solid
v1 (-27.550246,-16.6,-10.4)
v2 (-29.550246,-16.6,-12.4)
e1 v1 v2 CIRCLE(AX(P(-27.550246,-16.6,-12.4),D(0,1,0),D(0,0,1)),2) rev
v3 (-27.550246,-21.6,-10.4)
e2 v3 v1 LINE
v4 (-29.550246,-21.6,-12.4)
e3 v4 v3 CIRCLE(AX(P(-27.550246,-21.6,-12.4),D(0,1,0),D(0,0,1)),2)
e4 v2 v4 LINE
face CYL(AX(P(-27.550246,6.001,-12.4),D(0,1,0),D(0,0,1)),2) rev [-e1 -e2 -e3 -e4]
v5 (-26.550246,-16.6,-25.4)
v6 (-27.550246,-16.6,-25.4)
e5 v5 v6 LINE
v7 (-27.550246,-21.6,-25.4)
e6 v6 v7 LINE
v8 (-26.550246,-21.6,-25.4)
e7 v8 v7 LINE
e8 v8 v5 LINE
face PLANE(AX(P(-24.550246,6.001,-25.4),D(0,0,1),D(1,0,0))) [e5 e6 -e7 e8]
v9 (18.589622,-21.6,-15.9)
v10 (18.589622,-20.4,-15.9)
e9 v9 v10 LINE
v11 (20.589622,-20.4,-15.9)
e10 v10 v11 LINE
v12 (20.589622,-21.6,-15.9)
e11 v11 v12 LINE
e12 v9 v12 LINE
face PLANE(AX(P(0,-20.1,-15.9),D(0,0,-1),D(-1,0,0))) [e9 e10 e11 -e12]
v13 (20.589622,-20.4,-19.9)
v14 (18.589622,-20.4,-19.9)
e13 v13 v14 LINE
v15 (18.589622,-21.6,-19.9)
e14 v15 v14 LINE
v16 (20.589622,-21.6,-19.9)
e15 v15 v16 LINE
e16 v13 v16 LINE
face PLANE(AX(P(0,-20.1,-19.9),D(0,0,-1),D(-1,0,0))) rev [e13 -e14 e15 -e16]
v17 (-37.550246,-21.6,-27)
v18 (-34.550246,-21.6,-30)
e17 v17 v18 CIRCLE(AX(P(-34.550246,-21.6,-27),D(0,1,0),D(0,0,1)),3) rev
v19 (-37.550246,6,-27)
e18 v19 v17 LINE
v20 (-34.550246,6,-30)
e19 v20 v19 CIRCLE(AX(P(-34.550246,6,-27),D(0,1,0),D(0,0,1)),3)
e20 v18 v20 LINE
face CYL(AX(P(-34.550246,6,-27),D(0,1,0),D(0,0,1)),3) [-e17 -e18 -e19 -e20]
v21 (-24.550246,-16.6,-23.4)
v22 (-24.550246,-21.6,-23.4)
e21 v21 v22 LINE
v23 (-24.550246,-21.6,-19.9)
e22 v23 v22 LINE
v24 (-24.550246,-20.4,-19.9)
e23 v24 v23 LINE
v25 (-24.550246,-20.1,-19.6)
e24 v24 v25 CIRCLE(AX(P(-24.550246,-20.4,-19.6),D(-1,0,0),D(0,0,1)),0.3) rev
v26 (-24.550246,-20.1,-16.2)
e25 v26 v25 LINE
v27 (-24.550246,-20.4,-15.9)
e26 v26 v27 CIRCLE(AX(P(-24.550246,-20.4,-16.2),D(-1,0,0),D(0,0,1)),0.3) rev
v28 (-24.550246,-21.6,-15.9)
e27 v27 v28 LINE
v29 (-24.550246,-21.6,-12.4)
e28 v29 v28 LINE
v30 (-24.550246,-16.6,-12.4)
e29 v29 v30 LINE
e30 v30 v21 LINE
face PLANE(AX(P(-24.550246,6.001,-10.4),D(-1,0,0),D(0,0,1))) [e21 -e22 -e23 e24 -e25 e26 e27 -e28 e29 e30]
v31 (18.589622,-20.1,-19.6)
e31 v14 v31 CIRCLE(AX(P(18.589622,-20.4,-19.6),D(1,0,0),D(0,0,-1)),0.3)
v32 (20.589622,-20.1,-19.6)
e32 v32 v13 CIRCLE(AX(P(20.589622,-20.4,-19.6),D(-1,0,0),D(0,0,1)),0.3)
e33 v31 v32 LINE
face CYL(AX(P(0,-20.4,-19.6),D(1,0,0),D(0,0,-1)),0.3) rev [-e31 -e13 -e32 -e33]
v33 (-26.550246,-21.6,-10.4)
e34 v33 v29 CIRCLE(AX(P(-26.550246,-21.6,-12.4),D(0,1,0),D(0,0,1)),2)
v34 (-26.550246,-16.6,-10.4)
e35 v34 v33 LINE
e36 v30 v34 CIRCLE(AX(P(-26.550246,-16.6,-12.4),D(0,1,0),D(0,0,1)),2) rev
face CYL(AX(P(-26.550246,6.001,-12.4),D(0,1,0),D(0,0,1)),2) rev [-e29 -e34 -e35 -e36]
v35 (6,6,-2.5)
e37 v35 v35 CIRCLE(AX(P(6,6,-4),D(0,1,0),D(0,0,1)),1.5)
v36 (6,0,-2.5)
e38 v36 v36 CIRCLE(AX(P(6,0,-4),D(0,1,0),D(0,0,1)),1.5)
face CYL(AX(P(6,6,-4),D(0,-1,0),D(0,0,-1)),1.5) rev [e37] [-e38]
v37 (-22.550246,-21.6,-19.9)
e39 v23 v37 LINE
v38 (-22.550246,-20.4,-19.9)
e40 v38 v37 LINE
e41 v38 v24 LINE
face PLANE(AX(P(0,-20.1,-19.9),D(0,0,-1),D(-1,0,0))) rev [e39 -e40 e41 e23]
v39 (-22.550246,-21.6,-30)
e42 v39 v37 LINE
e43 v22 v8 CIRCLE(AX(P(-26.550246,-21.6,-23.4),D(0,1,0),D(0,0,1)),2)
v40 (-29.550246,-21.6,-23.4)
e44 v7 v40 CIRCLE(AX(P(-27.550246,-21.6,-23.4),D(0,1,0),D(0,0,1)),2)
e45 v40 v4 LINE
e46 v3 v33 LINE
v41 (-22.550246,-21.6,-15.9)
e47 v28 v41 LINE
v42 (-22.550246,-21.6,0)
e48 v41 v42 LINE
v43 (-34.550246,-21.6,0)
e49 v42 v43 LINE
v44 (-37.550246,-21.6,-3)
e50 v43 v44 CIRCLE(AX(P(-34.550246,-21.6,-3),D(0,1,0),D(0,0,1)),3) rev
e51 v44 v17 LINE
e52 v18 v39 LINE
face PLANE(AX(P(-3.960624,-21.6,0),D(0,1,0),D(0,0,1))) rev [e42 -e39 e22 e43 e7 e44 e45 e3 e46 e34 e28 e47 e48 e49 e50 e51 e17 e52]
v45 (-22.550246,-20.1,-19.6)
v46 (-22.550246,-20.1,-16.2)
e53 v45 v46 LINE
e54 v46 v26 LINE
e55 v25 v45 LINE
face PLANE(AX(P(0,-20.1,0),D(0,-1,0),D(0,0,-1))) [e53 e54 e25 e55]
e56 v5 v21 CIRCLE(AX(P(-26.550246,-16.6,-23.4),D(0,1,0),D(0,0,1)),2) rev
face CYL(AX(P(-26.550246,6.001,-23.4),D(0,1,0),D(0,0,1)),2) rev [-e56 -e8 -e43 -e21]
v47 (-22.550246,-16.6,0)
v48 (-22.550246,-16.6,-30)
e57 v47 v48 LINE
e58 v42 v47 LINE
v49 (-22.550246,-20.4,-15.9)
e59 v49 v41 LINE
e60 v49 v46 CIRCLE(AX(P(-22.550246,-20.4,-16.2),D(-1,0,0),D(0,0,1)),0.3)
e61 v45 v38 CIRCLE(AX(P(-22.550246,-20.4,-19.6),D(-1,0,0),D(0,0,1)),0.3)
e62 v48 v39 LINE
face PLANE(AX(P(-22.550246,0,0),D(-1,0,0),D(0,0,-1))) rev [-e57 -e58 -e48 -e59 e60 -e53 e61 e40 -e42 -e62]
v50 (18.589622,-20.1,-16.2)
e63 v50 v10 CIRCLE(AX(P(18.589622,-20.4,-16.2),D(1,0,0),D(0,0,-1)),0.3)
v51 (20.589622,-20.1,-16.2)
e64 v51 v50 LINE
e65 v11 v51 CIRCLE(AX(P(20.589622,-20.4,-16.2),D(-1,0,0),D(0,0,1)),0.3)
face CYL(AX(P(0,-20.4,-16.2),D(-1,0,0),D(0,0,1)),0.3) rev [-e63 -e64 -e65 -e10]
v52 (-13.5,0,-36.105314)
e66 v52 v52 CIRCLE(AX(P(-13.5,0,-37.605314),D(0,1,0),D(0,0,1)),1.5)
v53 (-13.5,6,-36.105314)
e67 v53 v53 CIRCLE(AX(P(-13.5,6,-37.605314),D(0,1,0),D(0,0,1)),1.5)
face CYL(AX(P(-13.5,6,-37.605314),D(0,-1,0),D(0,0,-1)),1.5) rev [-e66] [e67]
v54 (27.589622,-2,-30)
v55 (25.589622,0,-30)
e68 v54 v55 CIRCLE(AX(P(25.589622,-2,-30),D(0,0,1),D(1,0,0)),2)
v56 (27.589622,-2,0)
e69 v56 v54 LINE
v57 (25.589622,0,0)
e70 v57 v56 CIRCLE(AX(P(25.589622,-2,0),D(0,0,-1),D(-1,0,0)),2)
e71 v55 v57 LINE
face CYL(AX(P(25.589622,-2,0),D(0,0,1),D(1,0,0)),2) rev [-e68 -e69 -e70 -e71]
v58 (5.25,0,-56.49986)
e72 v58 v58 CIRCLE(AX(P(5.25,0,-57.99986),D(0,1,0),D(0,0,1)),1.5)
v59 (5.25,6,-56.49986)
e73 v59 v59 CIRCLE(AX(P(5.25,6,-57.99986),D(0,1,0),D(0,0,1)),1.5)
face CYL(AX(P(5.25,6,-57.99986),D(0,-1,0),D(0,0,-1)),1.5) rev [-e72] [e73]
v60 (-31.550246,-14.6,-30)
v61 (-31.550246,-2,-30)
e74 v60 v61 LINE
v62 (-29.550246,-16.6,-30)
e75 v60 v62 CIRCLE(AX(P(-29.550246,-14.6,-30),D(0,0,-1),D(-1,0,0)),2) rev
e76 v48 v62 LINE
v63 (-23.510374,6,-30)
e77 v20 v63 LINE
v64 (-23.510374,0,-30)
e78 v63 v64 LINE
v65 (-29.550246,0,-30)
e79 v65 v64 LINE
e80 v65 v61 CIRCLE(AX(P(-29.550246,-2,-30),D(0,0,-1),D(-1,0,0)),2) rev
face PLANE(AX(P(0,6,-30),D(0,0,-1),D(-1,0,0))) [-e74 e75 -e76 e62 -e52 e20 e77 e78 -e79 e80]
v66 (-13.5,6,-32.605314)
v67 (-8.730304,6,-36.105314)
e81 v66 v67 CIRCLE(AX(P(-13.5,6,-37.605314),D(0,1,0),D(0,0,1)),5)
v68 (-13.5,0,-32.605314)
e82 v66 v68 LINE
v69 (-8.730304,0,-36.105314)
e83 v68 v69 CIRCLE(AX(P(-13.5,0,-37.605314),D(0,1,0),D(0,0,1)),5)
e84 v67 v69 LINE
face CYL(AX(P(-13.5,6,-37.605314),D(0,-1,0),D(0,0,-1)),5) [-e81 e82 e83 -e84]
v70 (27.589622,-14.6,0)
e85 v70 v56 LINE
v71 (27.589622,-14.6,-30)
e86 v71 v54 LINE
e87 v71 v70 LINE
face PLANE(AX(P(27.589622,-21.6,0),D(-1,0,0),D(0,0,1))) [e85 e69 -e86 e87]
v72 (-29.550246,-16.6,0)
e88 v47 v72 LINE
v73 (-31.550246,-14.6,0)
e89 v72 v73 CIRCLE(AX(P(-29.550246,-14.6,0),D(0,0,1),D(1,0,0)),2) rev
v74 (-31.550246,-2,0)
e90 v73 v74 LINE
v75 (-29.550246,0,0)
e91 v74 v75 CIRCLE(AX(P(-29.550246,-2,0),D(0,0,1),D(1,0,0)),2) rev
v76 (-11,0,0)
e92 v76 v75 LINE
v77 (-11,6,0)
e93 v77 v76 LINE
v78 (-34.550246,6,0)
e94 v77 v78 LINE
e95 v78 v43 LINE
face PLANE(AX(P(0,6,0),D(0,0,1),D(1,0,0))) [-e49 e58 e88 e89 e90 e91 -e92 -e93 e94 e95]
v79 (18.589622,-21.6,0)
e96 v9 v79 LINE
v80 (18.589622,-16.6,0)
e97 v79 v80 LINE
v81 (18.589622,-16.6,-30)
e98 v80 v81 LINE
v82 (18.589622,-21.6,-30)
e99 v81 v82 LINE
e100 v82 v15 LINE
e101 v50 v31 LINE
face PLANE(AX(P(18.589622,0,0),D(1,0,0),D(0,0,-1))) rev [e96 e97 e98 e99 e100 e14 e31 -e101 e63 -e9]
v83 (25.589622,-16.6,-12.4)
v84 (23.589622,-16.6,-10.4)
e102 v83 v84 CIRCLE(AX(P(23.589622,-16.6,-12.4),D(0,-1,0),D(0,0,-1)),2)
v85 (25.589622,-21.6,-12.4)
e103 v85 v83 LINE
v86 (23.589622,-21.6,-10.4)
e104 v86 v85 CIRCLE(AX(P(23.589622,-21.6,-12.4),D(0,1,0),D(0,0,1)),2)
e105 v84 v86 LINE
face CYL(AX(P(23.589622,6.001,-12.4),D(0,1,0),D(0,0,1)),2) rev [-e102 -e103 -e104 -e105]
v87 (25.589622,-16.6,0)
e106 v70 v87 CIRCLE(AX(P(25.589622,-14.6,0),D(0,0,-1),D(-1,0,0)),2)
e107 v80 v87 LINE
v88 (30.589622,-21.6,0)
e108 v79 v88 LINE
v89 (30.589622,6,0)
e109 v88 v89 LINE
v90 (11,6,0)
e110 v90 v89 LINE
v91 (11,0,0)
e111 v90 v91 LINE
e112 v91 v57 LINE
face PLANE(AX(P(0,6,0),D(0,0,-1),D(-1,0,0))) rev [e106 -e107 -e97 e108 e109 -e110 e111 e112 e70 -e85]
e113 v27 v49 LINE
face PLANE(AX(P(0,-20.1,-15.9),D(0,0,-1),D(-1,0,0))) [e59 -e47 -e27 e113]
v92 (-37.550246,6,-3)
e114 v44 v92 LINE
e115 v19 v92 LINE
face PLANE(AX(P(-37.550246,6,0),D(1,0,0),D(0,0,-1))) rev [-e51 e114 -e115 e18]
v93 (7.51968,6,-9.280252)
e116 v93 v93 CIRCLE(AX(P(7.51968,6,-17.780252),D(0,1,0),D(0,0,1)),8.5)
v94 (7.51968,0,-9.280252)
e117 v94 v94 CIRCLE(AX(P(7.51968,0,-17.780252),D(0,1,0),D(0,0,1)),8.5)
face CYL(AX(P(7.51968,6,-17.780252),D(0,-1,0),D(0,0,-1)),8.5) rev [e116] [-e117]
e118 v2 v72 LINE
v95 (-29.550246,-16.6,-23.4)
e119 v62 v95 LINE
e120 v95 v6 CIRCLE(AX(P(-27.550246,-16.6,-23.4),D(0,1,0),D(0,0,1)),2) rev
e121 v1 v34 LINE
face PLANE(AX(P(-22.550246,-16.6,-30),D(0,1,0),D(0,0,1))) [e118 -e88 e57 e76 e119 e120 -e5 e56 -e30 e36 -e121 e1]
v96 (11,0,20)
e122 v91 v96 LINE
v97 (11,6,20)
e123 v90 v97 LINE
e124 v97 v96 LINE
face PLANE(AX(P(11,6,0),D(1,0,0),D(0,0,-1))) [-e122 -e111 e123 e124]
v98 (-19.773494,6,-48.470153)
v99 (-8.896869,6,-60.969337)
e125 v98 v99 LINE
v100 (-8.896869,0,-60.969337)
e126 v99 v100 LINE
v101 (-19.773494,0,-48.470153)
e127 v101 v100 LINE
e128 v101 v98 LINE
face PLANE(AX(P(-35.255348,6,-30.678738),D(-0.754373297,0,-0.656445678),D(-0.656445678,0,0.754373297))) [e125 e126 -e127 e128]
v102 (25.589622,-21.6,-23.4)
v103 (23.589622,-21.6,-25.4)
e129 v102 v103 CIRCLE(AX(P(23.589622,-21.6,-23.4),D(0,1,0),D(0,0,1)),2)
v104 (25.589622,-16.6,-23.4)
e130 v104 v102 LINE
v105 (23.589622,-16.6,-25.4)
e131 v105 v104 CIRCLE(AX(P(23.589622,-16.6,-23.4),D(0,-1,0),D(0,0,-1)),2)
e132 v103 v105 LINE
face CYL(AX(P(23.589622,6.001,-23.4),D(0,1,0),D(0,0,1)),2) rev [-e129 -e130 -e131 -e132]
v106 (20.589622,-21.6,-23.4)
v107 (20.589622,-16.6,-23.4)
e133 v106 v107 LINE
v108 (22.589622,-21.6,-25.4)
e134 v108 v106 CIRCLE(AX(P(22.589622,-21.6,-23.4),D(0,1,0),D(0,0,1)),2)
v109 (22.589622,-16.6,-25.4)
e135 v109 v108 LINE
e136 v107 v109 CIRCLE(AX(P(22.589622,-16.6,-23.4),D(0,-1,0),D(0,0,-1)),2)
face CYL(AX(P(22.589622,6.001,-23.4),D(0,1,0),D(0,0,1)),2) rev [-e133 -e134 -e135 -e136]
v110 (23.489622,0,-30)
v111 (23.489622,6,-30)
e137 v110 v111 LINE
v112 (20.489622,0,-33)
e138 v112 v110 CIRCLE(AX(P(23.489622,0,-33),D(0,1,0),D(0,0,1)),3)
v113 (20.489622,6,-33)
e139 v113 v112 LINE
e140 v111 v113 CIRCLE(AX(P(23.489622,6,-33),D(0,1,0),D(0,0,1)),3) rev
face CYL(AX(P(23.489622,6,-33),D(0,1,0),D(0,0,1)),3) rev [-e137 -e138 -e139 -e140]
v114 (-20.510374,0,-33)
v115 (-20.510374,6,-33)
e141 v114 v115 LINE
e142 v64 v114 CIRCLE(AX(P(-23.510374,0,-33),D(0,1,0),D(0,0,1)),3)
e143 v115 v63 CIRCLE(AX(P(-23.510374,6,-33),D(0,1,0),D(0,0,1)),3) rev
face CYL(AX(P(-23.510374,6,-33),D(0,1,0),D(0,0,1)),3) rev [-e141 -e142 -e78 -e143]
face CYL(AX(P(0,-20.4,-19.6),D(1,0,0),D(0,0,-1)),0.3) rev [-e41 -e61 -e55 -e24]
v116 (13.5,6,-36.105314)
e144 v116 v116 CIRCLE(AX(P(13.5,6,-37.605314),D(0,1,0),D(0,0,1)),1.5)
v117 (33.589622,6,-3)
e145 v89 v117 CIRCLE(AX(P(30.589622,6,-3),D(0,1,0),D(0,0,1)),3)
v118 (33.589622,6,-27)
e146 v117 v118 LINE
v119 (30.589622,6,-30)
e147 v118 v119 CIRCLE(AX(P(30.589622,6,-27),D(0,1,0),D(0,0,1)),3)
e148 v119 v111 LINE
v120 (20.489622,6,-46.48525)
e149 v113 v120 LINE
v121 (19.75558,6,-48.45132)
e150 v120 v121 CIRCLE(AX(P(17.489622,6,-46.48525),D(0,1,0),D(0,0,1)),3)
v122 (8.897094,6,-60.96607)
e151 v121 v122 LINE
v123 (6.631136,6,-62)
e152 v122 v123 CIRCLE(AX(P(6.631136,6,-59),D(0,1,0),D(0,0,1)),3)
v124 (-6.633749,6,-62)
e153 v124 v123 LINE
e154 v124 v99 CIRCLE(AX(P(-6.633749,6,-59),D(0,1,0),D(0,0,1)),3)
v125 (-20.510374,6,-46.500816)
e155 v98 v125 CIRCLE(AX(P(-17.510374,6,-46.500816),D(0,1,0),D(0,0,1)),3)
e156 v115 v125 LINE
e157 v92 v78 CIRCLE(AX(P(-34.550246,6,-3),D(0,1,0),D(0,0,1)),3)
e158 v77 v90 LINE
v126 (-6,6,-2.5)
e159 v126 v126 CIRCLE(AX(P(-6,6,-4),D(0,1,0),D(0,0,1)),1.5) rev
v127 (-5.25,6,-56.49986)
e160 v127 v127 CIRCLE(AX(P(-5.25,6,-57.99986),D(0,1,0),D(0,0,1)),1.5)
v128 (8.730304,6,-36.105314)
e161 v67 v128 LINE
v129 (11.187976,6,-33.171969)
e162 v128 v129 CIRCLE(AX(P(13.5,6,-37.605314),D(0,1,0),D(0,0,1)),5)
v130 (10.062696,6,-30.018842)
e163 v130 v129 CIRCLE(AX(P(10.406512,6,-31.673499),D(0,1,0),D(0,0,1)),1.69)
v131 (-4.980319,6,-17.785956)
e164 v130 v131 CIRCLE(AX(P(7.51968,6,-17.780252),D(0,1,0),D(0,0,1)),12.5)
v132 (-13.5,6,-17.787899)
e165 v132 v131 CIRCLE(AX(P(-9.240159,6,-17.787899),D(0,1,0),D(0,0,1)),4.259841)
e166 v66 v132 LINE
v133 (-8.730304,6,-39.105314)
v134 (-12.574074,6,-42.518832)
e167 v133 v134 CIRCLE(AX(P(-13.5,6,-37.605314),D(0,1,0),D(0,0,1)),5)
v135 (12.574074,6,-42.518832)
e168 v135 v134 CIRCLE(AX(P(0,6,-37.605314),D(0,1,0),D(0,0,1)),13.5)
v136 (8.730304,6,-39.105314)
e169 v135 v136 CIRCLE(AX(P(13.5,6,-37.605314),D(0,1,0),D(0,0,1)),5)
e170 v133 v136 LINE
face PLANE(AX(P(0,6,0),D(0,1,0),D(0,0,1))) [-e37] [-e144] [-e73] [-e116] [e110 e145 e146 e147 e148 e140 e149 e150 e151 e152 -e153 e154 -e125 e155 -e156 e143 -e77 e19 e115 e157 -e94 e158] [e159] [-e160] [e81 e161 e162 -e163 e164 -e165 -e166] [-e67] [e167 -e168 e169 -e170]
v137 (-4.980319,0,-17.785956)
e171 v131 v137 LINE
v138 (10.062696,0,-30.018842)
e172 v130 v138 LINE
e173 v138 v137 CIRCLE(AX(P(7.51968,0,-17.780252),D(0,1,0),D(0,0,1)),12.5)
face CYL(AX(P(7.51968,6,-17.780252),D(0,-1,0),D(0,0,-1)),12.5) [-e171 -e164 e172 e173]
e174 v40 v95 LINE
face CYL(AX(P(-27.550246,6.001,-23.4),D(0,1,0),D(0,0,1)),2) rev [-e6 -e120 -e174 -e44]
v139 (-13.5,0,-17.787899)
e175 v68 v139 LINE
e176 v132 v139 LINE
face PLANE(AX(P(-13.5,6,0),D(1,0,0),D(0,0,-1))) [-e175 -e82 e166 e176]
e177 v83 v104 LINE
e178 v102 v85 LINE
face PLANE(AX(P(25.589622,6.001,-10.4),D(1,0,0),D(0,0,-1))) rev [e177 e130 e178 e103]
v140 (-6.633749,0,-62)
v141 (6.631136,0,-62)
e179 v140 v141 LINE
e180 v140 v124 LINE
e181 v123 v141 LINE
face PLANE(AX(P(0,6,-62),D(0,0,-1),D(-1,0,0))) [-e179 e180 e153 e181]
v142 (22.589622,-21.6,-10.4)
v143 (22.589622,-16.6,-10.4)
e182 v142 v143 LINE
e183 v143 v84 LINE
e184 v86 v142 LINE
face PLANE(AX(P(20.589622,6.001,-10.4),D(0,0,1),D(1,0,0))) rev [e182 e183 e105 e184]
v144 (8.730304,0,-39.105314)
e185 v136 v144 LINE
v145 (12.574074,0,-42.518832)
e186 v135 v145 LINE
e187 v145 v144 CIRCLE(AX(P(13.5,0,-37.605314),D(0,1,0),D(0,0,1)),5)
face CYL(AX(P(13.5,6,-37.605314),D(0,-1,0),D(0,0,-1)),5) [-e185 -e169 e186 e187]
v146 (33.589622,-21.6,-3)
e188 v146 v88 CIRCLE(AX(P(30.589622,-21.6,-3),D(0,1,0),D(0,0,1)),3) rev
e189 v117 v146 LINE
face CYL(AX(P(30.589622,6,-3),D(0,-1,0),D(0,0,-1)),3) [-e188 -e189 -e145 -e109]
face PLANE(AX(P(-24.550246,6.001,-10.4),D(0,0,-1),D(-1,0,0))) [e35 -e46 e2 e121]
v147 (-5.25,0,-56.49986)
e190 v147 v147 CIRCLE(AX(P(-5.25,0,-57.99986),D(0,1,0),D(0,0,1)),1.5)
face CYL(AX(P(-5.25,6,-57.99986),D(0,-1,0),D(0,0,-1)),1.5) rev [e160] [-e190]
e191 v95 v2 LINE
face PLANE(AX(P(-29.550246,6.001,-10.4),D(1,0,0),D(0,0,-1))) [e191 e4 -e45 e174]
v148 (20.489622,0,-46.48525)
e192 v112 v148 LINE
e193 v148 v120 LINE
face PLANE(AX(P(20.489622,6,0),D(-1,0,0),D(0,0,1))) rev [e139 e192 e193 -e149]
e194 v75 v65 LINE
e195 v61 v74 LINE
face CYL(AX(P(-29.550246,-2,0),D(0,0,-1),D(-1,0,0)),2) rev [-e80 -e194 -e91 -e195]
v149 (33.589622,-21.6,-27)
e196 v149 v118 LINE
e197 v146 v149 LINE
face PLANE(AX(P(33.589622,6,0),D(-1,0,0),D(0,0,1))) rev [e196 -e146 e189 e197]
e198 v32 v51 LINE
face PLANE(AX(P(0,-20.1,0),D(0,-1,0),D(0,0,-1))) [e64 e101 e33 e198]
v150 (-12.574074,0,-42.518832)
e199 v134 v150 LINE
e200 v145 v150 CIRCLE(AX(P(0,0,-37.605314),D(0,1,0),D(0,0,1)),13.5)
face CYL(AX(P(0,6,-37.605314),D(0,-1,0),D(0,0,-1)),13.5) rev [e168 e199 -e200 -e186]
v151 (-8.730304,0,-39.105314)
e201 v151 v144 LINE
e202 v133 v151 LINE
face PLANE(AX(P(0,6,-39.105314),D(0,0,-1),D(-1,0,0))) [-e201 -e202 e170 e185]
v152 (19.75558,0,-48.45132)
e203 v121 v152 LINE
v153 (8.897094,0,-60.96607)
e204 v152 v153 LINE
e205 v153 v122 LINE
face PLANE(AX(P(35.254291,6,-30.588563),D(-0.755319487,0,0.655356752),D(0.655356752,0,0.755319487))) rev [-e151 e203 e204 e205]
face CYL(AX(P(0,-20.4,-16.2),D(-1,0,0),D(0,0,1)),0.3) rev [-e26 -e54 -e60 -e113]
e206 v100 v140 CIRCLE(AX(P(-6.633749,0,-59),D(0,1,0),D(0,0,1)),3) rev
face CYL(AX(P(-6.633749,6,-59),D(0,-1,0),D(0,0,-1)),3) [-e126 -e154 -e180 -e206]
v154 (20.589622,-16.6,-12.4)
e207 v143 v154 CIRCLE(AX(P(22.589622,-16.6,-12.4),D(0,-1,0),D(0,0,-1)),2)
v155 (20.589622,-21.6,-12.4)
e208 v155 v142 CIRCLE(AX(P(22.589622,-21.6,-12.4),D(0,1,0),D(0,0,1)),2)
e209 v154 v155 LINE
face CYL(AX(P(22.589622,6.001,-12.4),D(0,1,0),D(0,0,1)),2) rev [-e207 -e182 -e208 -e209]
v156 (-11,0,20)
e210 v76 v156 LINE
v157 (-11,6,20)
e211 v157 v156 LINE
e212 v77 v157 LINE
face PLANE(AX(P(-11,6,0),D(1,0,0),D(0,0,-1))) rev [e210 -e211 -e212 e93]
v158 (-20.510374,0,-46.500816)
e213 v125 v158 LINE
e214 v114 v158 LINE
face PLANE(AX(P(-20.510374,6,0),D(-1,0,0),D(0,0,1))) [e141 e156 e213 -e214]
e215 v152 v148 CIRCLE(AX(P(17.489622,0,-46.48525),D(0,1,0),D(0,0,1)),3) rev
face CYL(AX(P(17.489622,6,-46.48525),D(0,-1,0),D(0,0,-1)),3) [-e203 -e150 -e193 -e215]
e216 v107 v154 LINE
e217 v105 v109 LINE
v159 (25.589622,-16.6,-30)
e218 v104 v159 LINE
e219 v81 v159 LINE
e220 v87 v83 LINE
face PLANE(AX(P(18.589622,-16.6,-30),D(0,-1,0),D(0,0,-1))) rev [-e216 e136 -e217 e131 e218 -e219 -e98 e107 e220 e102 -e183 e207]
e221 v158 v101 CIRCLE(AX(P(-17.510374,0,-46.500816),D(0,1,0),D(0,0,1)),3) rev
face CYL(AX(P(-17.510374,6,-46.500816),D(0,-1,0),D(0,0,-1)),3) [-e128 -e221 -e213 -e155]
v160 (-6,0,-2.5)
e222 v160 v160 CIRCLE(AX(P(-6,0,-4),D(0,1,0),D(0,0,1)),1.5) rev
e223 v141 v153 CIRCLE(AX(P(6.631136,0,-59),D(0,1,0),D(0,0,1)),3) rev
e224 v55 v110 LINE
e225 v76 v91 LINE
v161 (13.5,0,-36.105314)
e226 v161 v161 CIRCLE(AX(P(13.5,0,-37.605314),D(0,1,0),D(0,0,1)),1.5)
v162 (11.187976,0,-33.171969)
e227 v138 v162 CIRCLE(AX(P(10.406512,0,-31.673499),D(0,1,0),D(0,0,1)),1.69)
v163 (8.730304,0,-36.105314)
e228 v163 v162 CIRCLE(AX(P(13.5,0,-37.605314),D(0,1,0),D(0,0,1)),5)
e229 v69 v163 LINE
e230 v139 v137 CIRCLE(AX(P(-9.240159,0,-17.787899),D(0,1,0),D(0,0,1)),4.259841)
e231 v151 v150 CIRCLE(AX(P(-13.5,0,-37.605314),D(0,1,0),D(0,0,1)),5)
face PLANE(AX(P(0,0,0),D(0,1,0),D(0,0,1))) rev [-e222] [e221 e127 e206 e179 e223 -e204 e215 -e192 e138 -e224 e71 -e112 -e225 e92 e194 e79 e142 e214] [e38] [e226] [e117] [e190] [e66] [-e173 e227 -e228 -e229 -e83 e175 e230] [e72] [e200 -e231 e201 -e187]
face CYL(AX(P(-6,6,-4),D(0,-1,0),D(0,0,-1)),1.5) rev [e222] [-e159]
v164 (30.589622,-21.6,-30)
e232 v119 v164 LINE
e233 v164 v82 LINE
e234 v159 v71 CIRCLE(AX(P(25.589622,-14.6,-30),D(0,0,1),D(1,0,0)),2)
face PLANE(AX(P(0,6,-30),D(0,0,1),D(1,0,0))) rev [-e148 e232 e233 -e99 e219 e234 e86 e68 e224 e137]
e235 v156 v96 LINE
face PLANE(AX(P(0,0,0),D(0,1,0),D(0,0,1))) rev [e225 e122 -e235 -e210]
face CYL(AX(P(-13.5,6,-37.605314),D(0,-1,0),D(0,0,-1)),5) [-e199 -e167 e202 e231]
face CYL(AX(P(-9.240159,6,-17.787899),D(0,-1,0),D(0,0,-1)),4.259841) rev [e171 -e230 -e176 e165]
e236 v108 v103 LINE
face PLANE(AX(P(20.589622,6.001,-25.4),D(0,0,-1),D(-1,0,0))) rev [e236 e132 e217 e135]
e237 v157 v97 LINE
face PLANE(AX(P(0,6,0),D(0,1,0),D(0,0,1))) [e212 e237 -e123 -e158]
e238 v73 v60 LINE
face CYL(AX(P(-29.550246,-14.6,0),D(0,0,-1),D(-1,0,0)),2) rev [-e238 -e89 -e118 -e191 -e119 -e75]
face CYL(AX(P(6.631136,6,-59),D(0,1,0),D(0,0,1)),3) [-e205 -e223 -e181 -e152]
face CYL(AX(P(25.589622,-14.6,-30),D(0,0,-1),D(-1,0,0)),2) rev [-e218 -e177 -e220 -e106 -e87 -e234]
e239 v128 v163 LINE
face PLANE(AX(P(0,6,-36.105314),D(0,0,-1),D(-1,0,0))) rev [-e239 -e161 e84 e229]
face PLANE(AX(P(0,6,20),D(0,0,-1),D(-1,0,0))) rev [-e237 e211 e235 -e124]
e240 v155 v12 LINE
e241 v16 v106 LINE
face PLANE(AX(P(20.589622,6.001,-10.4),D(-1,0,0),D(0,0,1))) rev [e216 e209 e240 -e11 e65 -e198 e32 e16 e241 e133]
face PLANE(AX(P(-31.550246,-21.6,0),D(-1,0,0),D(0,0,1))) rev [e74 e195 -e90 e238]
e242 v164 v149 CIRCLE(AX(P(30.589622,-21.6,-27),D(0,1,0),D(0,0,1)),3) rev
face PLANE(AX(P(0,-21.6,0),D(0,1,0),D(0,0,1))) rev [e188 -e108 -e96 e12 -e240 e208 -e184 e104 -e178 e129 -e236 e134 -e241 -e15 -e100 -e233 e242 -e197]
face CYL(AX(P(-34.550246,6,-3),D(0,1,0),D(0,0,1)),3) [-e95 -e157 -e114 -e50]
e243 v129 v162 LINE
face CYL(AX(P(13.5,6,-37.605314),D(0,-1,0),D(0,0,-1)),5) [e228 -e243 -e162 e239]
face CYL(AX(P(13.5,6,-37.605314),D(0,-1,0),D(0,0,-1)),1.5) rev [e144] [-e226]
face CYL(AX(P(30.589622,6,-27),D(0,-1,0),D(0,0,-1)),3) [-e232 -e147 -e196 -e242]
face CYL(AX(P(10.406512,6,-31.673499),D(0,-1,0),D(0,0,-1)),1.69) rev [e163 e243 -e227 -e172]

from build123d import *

# Parameters (mm, degrees)
SKETCH1_R                = 1.5
SKETCH1_R_2              = 8.5
SKETCH1_W                = 6
SKETCH1_H                = 30
SKETCH1_W_2              = 22
SKETCH1_H_2              = 20
BOSS_EXTRUDE1_DEPTH      = 6
SKETCH1_5_W              = 6
SKETCH1_5_H              = 30
RESSALTO_EXTRUS_O1_DEPTH = 21.6
ESBO_O1_W                = 30
ESBO_O1_H                = 5
RESSALTO_EXTRUS_O2_DEPTH = 9
CORTE_EXTRUS_O1_REACH    = 79.561
ESBO_O2_W                = 5
ESBO_O2_H                = 15
FILETE2_R                = 2
FILETE2_OF_ESPELHAR1_R   = 2
FILLET1_R                = 3
FILETE1_R                = 2
ESBO_O4_W                = 2
ESBO_O4_H                = 4
ESBO_O4_W_2              = 45.13986754
CORTE_EXTRUS_O3_DEPTH    = 1.5
FILETE3_R                = 0.3


with BuildPart() as part:
    # Sketch1 → Boss-Extrude1 (new body)
    # profile 1 of 6: a face of its own
    with BuildSketch(Plane(origin=(0, 0, 0), x_dir=(1, 0, 0), z_dir=(0, 1, 0))):
        Polygon((-20.510374251, 47.623346162), (-8, 62), (8, 62), (20.489621783, 47.605313925), (20.489621783, 17.605313925), (11, 0), (-11, 0), (-20.510374251, 17.623346162), align=None)
        with Locations(Location((13.5, 37.605313925, 0), (0, 0, 270))):
            Circle(SKETCH1_R, mode=Mode.SUBTRACT)
        with Locations(Location((-13.5, 37.605313925, 0), (0, 0, 270))):
            Circle(SKETCH1_R, mode=Mode.SUBTRACT)
        with Locations(Location((5.25, 57.999859765, 0), (0, 0, 270))):
            Circle(SKETCH1_R, mode=Mode.SUBTRACT)
        with Locations(Location((-5.25, 57.999859765, 0), (0, 0, 270))):
            Circle(SKETCH1_R, mode=Mode.SUBTRACT)
        with Locations(Location((7.519679741, 17.780252273, 0), (0, 0, 270))):
            Circle(SKETCH1_R_2, mode=Mode.SUBTRACT)
        with Locations(Location((6, 4, 0), (0, 0, 270))):
            Circle(SKETCH1_R, mode=Mode.SUBTRACT)
        with Locations(Location((-6, 4, 0), (0, 0, 270))):
            Circle(SKETCH1_R, mode=Mode.SUBTRACT)
        with BuildLine():
            ThreePointArc((10.062695821, 30.018841621), (11.998189223, 31.105465162), (11.187975781, 33.171969363))
            ThreePointArc((11.187975781, 33.171969363), (9.667400631, 34.394210987), (8.730303993, 36.105313925))
            Line((8.730303993, 36.105313925), (-8.730303993, 36.105313925))
            ThreePointArc((-8.730303993, 36.105313925), (-10.541960108, 33.574185051), (-13.5, 32.605313925))
            Line((-13.5, 32.605313925), (-13.5, 17.787899155))
            ThreePointArc((-13.5, 17.787899155), (-9.241131059, 13.528058523), (-4.980318958, 17.785955551))
            ThreePointArc((-4.980318958, 17.785955551), (-0.366780245, 27.478383479), (10.062695821, 30.018841621))
        make_face(mode=Mode.SUBTRACT)
        with BuildLine():
            ThreePointArc((12.574074074, 42.518832133), (0, 51.105313925), (-12.574074074, 42.518832133))
            ThreePointArc((-12.574074074, 42.518832133), (-10.179901517, 41.34388933), (-8.730303993, 39.105313925))
            Line((-8.730303993, 39.105313925), (8.730303993, 39.105313925))
            ThreePointArc((8.730303993, 39.105313925), (10.179901517, 41.34388933), (12.574074074, 42.518832133))
        make_face(mode=Mode.SUBTRACT)
    # profile 2 of 6: a face of its own
    with BuildSketch(Plane(origin=(0, 0, 0), x_dir=(1, 0, 0), z_dir=(0, 1, 0))):
        Polygon((20.489621783, 17.605313925), (11, 0), (27.589621783, 0), (27.589621783, 30), (20.489621783, 30), align=None)
    # profile 3 of 6: a face of its own
    with BuildSketch(Plane(origin=(0, 0, 0), x_dir=(1, 0, 0), z_dir=(0, 1, 0))):
        with Locations((30.589621783, 15)):
            Rectangle(SKETCH1_W, SKETCH1_H)
    # profile 4 of 6: a face of its own
    with BuildSketch(Plane(origin=(0, 0, 0), x_dir=(1, 0, 0), z_dir=(0, 1, 0))):
        with Locations((0, -10)):
            Rectangle(SKETCH1_W_2, SKETCH1_H_2)
    # profile 5 of 6: a face of its own
    with BuildSketch(Plane(origin=(0, 0, 0), x_dir=(1, 0, 0), z_dir=(0, 1, 0))):
        Polygon((-31.550245757, 0), (-11, 0), (-20.510374251, 17.623346162), (-20.510374251, 30), (-31.550245757, 30), align=None)
    # profile 6 of 6: a face of its own
    with BuildSketch(Plane(origin=(0, 0, 0), x_dir=(1, 0, 0), z_dir=(0, 1, 0))):
        with Locations((-34.550245757, 15)):
            Rectangle(SKETCH1_W, SKETCH1_H)
    extrude(amount=BOSS_EXTRUDE1_DEPTH)

    # Sketch1<5> → Ressalto-extrusão1 (add)
    with BuildSketch(Plane(origin=(0, 0, 0), x_dir=(1, 0, 0), z_dir=(0, 1, 0))):
        with Locations((30.589621783, 15)):
            Rectangle(SKETCH1_5_W, SKETCH1_5_H)
    ressalto_extrus_o1 = extrude(amount=-RESSALTO_EXTRUS_O1_DEPTH)

    # Esboço1 → Ressalto-extrusão2 (add)
    with BuildSketch(Plane.ZY.offset(-27.589621783)):
        with Locations((-15, -19.1)):
            Rectangle(ESBO_O1_W, ESBO_O1_H)
    ressalto_extrus_o2 = extrude(amount=RESSALTO_EXTRUS_O2_DEPTH)

    # Esboço2 → Corte-extrusão1 (cut, up to next)
    with BuildSketch(Plane.XZ.offset(21.6), mode=Mode.PRIVATE) as corte_extrus_o1_sk1:
        with Locations((23.089621783, -17.9)):
            Rectangle(ESBO_O2_W, ESBO_O2_H)
    corte_extrus_o1_tool1 = extrude(corte_extrus_o1_sk1.sketch, amount=-CORTE_EXTRUS_O1_REACH, mode=Mode.PRIVATE) & part.part
    corte_extrus_o1 = corte_extrus_o1_tool1.solids().sort_by_distance((23.089622, -21.6, -17.9))[0]
    add(corte_extrus_o1, mode=Mode.SUBTRACT)

    # Filete2
    filete2_edges = [part.edges().sort_by_distance(p)[0] for p in [
        (25.589621783, -19.1, -25.4),
        (25.589621783, -19.1, -10.4),
        (20.589621783, -19.1, -10.4),
        (20.589621783, -19.1, -25.4),
    ]]
    fillet(filete2_edges, radius=FILETE2_R)

    # Espelhar1: Ressalto-extrusão1, Ressalto-extrusão2, Corte-extrusão1 across plane
    add(ressalto_extrus_o1.mirror(Plane.ZY.offset(1.980311987)))
    add(ressalto_extrus_o2.mirror(Plane.ZY.offset(1.980311987)))
    add(corte_extrus_o1.mirror(Plane.ZY.offset(1.980311987)), mode=Mode.SUBTRACT)

    # Filete2 of Espelhar1
    filete2_of_espelhar1_edges = [part.edges().sort_by_distance(p)[0] for p in [
        (-29.550245757, -19.1, -25.4),
        (-29.550245757, -19.1, -10.4),
        (-24.550245757, -19.1, -10.4),
        (-24.550245757, -19.1, -25.4),
    ]]
    fillet(filete2_of_espelhar1_edges, radius=FILETE2_OF_ESPELHAR1_R)

    # Fillet1
    fillet1_edges = [part.edges().sort_by_distance(p)[0] for p in [
        (-20.510374251, 3, -47.623346162),
        (-8, 3, -62),
        (8, 3, -62),
        (20.489621783, 3, -47.605313925),
        (20.489621783, 3, -30),
        (33.589621783, -7.8, -30),
        (33.589621783, -7.8, 0),
        (-37.550245757, -7.8, 0),
        (-37.550245757, -7.8, -30),
        (-20.510374251, 3, -30),
    ]]
    fillet(fillet1_edges, radius=FILLET1_R)

    # Filete1
    filete1_edges = [part.edges().sort_by_distance(p)[0] for p in [
        (27.589621783, 0, -15),
        (27.589621783, -16.6, -15),
        (-31.550245757, 0, -15),
        (-31.550245757, -16.6, -15),
    ]]
    fillet(filete1_edges, radius=FILETE1_R - 0.0001)  # a hair under: the kernel refuses the full size

    # Esboço4 → Corte-extrusão3 (cut)
    with BuildSketch(Plane.XZ.offset(21.6)):
        with Locations((-23.550245757, -17.9)):
            Rectangle(ESBO_O4_W, ESBO_O4_H)
        with Locations((0.019688013, -17.9)):
            Rectangle(ESBO_O4_W_2, ESBO_O4_H)
    extrude(amount=-CORTE_EXTRUS_O3_DEPTH, mode=Mode.SUBTRACT)

    # Filete3
    filete3_edges = [part.edges().sort_by_distance(p)[0] for p in [
        (19.589621783, -20.1, -19.9),
        (-23.550245757, -20.1, -19.9),
        (19.589621783, -20.1, -15.9),
        (-23.550245757, -20.1, -15.9),
    ]]
    fillet(filete3_edges, radius=FILETE3_R)


solid = part.part
